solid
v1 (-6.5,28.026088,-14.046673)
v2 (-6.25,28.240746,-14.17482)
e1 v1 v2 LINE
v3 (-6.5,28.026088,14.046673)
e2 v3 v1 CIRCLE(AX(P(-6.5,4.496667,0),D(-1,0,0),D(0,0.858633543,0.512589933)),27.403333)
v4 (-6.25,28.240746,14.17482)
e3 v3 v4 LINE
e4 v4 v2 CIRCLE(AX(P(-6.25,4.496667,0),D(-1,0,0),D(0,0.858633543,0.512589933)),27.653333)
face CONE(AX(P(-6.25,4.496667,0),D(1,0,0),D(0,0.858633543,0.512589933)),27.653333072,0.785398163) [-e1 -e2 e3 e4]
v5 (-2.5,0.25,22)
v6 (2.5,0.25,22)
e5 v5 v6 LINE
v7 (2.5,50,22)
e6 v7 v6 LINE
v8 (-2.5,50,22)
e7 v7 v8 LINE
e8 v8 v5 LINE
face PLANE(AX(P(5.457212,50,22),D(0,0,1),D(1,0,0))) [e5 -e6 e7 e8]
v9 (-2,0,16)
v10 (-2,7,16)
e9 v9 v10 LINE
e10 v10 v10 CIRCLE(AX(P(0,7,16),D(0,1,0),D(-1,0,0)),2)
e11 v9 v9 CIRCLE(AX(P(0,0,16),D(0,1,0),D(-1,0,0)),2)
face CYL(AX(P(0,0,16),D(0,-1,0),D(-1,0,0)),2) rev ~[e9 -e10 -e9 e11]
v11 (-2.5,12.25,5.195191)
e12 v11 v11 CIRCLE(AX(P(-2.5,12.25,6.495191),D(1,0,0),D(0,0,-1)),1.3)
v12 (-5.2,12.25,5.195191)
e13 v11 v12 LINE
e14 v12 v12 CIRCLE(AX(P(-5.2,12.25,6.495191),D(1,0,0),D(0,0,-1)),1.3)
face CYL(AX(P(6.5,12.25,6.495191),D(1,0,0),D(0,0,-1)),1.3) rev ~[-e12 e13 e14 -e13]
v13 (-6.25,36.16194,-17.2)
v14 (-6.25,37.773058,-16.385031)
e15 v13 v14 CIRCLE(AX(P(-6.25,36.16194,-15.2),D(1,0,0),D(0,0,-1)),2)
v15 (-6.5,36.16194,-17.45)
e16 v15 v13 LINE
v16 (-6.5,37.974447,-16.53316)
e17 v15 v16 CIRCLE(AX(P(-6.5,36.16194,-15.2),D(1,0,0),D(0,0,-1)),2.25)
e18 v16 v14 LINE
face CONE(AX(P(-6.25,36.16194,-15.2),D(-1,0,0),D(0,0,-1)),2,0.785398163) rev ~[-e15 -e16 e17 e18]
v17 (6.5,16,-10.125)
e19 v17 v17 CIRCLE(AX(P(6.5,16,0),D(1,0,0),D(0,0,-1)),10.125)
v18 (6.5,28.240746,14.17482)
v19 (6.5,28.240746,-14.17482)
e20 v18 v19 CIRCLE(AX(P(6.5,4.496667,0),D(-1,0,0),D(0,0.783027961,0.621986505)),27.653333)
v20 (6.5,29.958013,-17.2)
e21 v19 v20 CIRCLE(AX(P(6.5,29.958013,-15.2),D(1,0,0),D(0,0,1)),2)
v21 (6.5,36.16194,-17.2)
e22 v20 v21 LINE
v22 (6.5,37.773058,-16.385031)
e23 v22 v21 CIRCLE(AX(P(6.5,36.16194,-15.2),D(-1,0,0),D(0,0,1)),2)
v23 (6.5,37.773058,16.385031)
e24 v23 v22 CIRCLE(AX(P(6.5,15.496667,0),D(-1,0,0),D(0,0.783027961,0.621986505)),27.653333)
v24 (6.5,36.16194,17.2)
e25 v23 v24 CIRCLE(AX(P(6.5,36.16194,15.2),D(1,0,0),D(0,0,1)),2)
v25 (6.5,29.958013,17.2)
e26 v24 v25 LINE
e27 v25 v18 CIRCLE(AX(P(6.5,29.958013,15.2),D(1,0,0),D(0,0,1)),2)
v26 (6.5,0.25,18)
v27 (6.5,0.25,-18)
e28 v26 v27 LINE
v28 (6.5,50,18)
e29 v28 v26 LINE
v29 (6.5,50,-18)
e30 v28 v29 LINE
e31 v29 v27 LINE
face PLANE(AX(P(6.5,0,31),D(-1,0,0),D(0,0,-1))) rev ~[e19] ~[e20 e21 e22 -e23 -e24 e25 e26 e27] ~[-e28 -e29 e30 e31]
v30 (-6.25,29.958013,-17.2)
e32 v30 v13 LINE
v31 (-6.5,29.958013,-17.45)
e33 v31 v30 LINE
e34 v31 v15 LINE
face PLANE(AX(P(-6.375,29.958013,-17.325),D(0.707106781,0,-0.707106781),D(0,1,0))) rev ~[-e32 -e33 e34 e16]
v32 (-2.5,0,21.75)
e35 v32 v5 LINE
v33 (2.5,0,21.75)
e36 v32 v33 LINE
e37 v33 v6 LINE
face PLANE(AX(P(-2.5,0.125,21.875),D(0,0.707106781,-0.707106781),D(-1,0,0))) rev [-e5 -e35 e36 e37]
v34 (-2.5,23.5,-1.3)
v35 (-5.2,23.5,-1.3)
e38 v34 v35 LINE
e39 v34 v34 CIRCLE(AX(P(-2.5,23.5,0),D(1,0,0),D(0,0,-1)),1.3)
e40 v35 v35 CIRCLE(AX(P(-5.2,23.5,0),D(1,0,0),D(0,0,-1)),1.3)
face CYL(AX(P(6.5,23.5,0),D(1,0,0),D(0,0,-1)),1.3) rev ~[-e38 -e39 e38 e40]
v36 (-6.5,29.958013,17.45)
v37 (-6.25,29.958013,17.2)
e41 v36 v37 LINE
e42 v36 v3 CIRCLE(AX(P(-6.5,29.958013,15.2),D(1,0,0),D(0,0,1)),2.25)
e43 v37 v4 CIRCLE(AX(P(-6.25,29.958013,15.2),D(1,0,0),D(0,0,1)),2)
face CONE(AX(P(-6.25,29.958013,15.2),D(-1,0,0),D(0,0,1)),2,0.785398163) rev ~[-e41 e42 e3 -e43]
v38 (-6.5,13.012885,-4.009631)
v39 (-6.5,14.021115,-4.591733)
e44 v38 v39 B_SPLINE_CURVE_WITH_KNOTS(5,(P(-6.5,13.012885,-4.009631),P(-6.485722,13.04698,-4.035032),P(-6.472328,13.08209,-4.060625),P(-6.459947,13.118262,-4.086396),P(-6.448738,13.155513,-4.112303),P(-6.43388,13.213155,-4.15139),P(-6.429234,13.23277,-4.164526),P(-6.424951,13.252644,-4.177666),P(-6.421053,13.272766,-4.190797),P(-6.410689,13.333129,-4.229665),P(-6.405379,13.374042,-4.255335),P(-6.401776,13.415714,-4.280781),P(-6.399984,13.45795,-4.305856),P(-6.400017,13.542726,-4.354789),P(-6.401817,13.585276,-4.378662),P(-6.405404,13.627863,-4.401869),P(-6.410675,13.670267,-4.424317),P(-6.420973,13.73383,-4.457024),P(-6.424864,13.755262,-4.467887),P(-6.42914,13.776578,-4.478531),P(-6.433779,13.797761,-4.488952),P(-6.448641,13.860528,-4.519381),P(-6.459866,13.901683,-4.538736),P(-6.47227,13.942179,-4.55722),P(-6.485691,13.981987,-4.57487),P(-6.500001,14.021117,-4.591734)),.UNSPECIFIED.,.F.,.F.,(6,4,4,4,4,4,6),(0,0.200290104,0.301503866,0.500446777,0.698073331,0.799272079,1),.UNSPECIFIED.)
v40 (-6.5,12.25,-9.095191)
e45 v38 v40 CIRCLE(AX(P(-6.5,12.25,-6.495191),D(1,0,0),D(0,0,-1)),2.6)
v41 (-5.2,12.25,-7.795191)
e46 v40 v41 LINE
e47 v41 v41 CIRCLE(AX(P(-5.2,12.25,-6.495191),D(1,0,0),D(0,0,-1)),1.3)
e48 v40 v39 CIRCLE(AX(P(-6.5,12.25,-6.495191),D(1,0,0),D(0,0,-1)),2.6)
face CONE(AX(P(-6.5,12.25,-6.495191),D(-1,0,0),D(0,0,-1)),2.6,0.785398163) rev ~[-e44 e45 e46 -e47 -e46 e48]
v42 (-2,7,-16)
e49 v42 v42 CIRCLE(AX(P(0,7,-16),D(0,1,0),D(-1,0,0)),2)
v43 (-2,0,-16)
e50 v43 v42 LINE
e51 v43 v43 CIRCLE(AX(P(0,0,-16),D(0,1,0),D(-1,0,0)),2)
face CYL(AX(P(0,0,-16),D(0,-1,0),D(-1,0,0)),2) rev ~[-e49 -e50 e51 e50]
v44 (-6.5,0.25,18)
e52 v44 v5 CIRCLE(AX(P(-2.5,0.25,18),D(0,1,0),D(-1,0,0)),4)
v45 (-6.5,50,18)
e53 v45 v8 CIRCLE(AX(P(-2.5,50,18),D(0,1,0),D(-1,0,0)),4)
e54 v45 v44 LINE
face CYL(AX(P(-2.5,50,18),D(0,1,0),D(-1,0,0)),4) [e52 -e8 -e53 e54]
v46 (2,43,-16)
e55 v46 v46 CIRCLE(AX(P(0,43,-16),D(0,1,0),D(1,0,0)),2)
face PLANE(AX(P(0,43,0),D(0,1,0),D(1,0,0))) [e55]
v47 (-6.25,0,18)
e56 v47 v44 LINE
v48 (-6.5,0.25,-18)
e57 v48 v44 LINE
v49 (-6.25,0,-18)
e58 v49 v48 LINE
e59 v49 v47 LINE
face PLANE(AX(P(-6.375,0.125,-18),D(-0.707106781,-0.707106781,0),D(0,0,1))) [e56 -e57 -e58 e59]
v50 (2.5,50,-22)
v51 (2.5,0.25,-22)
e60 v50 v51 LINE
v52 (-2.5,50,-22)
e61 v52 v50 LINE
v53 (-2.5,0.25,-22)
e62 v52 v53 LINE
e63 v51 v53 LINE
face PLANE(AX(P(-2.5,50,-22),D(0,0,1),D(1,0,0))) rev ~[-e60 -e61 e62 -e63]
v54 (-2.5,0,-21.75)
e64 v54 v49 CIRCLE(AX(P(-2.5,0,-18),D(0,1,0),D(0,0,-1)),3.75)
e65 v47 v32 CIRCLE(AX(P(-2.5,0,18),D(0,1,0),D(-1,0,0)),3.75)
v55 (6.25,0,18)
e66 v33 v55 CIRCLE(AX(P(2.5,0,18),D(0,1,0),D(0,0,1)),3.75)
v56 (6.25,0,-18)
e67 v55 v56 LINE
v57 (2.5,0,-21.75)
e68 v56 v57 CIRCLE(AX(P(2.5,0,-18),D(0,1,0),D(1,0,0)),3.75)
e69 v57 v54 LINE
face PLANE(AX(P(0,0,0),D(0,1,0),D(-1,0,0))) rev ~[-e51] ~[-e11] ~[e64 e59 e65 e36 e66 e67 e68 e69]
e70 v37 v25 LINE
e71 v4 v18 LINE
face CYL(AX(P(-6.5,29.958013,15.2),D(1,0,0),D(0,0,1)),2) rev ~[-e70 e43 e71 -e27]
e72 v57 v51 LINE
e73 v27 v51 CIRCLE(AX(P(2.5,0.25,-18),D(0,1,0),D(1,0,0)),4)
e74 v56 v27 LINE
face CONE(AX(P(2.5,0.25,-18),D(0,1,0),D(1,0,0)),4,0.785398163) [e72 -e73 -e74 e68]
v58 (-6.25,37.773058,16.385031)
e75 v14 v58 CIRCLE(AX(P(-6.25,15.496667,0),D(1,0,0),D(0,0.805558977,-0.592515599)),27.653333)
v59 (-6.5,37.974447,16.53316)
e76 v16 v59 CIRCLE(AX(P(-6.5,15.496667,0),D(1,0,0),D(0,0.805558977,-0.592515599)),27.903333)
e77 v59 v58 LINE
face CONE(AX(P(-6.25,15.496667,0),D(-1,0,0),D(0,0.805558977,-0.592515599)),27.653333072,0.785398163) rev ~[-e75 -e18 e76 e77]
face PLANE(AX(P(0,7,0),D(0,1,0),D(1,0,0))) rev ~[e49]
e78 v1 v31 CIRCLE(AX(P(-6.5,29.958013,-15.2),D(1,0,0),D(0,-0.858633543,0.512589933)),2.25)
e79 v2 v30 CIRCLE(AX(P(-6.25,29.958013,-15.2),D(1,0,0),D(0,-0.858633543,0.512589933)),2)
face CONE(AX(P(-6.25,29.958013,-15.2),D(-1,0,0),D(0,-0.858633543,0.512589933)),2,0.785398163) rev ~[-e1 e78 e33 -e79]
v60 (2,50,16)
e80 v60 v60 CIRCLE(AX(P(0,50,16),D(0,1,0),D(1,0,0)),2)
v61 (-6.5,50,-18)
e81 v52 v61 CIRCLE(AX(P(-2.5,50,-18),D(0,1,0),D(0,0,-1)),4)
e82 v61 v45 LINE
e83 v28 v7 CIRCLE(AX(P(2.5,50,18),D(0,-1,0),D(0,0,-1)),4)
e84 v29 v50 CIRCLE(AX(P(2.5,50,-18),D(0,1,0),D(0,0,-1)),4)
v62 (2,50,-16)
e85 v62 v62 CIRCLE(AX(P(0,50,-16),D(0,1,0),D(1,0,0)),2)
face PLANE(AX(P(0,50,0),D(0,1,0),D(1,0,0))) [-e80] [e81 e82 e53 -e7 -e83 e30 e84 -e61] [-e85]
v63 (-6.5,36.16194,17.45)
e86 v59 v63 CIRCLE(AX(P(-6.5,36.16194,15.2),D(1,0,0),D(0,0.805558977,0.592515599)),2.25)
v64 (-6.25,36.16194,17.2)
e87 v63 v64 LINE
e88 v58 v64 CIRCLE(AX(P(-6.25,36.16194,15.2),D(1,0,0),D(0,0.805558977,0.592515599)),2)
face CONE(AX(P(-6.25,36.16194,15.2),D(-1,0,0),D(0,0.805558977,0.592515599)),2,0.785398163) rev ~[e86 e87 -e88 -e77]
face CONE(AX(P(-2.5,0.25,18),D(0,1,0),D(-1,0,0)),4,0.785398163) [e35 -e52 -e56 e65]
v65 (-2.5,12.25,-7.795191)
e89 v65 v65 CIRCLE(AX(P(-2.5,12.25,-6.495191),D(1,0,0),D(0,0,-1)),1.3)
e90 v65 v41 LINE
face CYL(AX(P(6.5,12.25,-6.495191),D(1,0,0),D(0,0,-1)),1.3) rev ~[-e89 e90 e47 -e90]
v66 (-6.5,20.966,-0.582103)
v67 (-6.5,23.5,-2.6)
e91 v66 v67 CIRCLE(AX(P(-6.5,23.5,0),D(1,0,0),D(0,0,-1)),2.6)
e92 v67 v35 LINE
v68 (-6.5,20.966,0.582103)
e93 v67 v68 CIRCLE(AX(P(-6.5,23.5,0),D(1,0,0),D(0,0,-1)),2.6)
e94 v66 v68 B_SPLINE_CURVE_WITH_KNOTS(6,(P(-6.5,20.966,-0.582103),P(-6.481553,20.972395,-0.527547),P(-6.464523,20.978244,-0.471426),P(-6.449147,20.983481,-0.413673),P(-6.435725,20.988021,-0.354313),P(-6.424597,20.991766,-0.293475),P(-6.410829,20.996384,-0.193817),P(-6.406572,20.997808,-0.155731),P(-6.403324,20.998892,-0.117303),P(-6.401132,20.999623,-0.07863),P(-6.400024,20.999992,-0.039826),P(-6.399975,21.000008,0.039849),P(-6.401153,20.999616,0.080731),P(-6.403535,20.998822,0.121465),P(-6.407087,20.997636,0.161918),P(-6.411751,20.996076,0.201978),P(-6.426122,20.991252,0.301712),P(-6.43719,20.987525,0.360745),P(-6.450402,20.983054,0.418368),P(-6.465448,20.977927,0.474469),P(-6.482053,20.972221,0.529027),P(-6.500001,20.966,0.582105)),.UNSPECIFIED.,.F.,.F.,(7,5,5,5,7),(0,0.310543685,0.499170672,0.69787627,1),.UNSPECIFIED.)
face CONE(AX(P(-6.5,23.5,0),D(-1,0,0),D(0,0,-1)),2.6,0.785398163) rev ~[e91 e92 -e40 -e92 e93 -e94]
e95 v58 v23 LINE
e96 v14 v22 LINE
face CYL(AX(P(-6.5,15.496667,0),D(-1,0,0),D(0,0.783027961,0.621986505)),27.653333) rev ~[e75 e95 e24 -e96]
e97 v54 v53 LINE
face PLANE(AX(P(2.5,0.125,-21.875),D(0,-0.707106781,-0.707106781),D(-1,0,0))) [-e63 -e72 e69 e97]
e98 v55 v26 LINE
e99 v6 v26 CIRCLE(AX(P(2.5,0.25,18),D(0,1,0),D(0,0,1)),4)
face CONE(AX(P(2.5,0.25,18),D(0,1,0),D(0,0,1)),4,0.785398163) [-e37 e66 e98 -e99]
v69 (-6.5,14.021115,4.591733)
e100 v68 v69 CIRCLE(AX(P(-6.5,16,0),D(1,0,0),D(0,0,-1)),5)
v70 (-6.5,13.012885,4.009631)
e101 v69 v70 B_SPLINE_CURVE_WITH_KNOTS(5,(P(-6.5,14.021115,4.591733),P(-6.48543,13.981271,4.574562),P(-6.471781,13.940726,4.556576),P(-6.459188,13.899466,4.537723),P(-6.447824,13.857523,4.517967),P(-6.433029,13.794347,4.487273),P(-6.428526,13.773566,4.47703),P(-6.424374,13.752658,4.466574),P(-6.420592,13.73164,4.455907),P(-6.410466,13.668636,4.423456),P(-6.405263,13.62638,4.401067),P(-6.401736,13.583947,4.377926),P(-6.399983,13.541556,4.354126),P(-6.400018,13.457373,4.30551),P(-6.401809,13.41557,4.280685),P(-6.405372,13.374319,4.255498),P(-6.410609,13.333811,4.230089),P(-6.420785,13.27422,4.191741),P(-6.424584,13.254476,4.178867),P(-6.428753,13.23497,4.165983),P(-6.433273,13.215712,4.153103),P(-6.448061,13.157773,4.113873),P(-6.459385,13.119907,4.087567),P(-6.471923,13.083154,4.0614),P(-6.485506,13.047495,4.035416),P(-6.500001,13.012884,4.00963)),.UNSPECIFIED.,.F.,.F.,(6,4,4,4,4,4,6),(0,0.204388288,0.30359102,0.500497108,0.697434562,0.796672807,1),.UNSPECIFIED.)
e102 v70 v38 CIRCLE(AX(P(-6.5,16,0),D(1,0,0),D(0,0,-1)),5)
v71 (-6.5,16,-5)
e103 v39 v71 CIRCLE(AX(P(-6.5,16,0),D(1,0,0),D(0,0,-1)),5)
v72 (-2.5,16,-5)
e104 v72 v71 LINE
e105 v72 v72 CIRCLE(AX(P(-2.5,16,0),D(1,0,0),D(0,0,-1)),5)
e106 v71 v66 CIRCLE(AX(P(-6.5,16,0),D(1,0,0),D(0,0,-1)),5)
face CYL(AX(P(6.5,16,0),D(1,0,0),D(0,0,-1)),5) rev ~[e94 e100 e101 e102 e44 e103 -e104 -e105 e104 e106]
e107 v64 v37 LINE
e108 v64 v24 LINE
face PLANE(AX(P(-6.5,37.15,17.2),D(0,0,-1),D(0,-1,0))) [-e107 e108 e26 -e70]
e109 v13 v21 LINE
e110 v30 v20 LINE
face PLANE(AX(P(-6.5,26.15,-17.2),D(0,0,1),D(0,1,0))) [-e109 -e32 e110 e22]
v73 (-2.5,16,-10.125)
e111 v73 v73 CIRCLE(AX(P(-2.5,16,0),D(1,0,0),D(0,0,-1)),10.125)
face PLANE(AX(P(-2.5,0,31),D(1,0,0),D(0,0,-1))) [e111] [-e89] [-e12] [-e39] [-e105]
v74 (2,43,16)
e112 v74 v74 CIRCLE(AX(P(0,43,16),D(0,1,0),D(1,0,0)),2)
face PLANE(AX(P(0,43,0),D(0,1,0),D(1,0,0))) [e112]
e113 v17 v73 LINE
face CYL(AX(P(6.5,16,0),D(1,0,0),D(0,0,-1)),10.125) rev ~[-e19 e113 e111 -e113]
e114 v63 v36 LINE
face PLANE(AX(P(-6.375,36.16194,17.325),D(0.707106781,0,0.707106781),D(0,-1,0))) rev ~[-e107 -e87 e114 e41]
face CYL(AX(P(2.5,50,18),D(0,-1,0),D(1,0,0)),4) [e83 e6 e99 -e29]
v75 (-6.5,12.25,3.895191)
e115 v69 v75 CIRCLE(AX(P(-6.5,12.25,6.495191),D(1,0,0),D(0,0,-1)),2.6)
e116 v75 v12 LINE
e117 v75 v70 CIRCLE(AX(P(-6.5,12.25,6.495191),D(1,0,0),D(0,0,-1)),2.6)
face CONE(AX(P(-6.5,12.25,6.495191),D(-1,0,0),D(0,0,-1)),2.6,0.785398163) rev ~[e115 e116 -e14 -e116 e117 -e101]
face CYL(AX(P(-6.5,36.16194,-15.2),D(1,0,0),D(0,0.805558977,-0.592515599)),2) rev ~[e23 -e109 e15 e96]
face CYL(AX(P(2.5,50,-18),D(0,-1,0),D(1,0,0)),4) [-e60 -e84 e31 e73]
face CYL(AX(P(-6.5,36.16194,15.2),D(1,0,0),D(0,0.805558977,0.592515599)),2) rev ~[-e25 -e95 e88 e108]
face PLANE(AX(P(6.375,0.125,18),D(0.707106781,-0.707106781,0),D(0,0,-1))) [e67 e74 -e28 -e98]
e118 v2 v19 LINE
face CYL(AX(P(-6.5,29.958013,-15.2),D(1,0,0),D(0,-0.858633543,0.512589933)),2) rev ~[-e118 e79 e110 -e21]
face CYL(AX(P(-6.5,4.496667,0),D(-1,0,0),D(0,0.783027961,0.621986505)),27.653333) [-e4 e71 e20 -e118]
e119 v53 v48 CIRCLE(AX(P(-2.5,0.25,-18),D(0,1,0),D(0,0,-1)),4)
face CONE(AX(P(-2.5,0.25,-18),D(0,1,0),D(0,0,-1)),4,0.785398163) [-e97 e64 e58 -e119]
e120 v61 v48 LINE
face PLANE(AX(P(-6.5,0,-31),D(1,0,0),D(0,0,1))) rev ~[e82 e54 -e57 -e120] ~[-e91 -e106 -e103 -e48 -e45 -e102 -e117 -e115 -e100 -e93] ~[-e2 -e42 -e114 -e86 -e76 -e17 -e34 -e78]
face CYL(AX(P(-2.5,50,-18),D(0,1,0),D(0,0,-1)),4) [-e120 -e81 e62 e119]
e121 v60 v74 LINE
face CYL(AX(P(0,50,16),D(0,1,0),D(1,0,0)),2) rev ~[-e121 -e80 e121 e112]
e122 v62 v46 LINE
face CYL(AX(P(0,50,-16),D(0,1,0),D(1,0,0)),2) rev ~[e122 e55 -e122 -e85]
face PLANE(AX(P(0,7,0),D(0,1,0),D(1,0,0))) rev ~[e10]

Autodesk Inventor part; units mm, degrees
ref_plane "YZ Plane" through (0, 0, 0) normal (1, 0, 0) x (0, 1, 0)
ref_plane "XZ Plane" through (0, 0, 0) normal (0, 1, 0) x (-1, 0, 0)
ref_plane "XY Plane" through (0, 0, 0) normal (0, 0, 1) x (1, 0, 0)
sketch "Эскиз1" plane through (0, 0, 0) normal (0, 1, 0) x (-1, 0, 0)
  line L0 (6.5, 31) -> (-6.5, 31)
  line L1 (-6.5, 31) -> (-6.5, -31)
  line L2 (-6.5, -31) -> (6.5, -31)
  line L3 (6.5, -31) -> (6.5, 31)
  line L4 (-6.5, 31) -> (6.5, -31) construction
  line L5 (0, 31) -> (0, -31) construction
  circle A0 centre (0, 16) radius 2
  line L6 (6.5, 0) -> (-6.5, 0) construction
  circle A1 centre (0, -16) radius 2
  point P0 (0, 0)
  point P1 (0, 0)
  dimension "d0" = 13
  dimension "d1" = 62
  dimension "d2" = 16
  dimension "d3" = 4
extrude "Выдавливание1" add sketch "Эскиз1" along normal blind 32
sketch "Эскиз2" plane through (6.5, 0, 31) normal (1, 0, 0) x (0, 0, -1)
  line L0 (0, 32) -> (62, 32)
  line L1 (62, 0) -> (0, 0)
  line L2 (62, 32) -> (0, 0) construction
  circle A0 centre (31, 16) radius 10.15
  line L3 (20.85, 16) -> (41.15, 16) construction
  circle A1 centre (31, 16) radius 10.125
  line L4 (31, 26.125) -> (31, 5.875)
  line L5 (62, 0) -> (62, 32)
  circle A2 centre (31, 16) radius 5
  line L6 (31, 16) -> (24.504809, 12.25) construction
  line L7 (31, 16) -> (37.495191, 12.25) construction
  circle A3 centre (31, 16) radius 7.5 construction
  circle A4 centre (31, 23.5) radius 1.3
  circle A5 centre (37.495191, 12.25) radius 1.3
  circle A6 centre (24.504809, 12.25) radius 1.3
  line L8 (37.495191, 12.25) -> (36.55555, 10.622495) construction
  circle A7 centre (31, 16) radius 10 construction
  line L9 (37.495191, 12.25) -> (39.660254, 11) construction
  point P0 (31, 0)
  dimension "d60" = 20
  dimension "d9" = 20.3
  dimension "d17" = 10
  dimension "d21" = 20.25
  dimension "d57" = 120
  dimension "d58" = 120
  dimension "d59" = 2.6
  dimension "d61" = 2.5
  dimension "d65" = 15
extrude "Выдавливание3" cut sketch "Эскиз2" against normal through all contours A4 L4 | L4 A4 | A2 L4 | L4 A2 | A5 | A6
sketch "Эскиз2 outline for Выдавливание4" plane through (6.5, 0, 31) normal (1, 0, 0) x (0, 0, -1)
  circle A0 centre (31, 16) radius 10.125
extrude "Выдавливание4" cut sketch "Эскиз2 outline for Выдавливание4" against normal blind 9
sketch "Эскиз3" plane through (0, 32, 0) normal (0, 1, 0) x (1, 0, 0)
  circle A0 centre (0, -16) radius 2 projected
  circle A1 centre (0, 16) radius 2 projected
  point P0 (0, 0)
extrude "Выдавливание5" add sketch "Эскиз3" against normal blind 25
fillet "Сопряжение1" radius 6 2 edges at (6.5, 16, 31) (6.5, 16, -31)
chamfer "Фаска1" distance 1.3 angle 45 3 edges at (-6.5, 12.25, 7.7952) (-6.5, 12.25, -5.1952) (-6.5, 23.5, 1.3)
sketch "Эскиз6" plane through (0, 32, 0) normal (0, 1, 0) x (1, 0, 0)
  arc A0 (6.5, 25) -> (0.5, 31) centre (0.5, 25) ccw projected
  line L0 (0.5, 31) -> (-6.5, 31) projected
  line L1 (-6.5, 31) -> (-6.5, -31) projected
  line L2 (-6.5, -31) -> (0.5, -31) projected
  arc A1 (0.5, -31) -> (6.5, -25) centre (0.5, -25) ccw projected
  line L3 (6.5, -25) -> (6.5, 25) projected
  point P0 (0, 0)
extrude "Выдавливание6" add sketch "Эскиз6" along normal blind 18
sketch "Эскиз7" plane through (0, 50, 0) normal (0, 1, 0) x (1, 0, 0)
  circle A0 centre (0, -16) radius 2 projected
  circle A1 centre (0, 16) radius 2 projected
  point P0 (0, 0)
extrude "Выдавливание7" cut sketch "Эскиз7" against normal blind 7
sketch "Эскиз9" plane through (-6.5, 0, -31) normal (-1, 0, 0) x (0, 0, 1)
  line L0 (0, 0) -> (0, 50)
  line L1 (0, 50) -> (62, 0) construction
  line L2 (7.2, 43) -> (54.8, 43)
  line L3 (54.8, 43) -> (54.8, 7)
  line L4 (54.8, 7) -> (7.2, 7)
  line L5 (7.2, 7) -> (7.2, 43)
  line L6 (0, 50) -> (62, 50)
  line L7 (0, 0) -> (62, 0)
  line L8 (62, 0) -> (62, 50)
  line L9 (62, 0) -> (56, 0)
  line L10 (7.2, 43) -> (0, 43) construction
  line L11 (7.2, 7) -> (0, 7) construction
  line L12 (54.8, 7) -> (62, 7) construction
  line L13 (54.8, 43) -> (62, 43) construction
  arc A0 (0, 7) -> (0, 43) centre (-18.9, 25) ccw
  arc A1 (62, 43) -> (62, 7) centre (80.9, 25) ccw
  line L14 (13.8, 38.870968) -> (48.2, 38.870968) construction
  line L15 (48.2, 38.870968) -> (48.2, 26.15)
  line L16 (48.2, 26.15) -> (13.8, 26.15) construction
  line L17 (13.8, 26.15) -> (13.8, 38.870968)
  line L18 (31, 38.870968) -> (31, 50) construction
  arc A2 (48.2, 26.15) -> (13.8, 26.15) centre (31, 4.496667) ccw
  arc A3 (26.990369, 13.012884) -> (35.009631, 13.012884) centre (31, 16) ccw
  arc A4 (48.2, 37.15) -> (13.8, 37.15) centre (31, 15.496667) ccw
  line L19 (13.8, 37.15) -> (48.2, 37.15) construction
  circle A5 centre (31, 16) radius 10.15 construction
  point P0 (31, 0)
  point P1 (31, 25)
  point P2 (54.8, 25)
  point P3 (7.2, 25)
  point P4 (31, 32.15)
  dimension "d30" = 7
  dimension "d31" = 7
  dimension "d33" = 7.2
  dimension "d42" = 6.6
  dimension "d44" = 11
  dimension "d45" = 6
extrude "Выдавливание8" cut sketch "Эскиз9" against normal up to surface (13 mm away) contours L0 A0 | A1 L8
extrude "Выдавливание9" cut sketch "Эскиз9" against normal up to surface (13 mm away) contours A4 L2 | L2 A4 L15 A2 L17
fillet "Сопряжение2" radius 2 4 edges at (0, 26.15, 17.2) (0, 26.15, -17.2) (0, 37.15, 17.2) (0, 37.15, -17.2)
sketch "Эскиз11" plane through (0, 50, 0) normal (0, 1, 0) x (1, 0, 0)
  arc A0 (1, -22) -> (-3, -26) centre (1, -26) ccw
  line L0 (-3, -29.486243) -> (-3, -26)
  line L1 (5.457212, -22) -> (-4.601252, -22)
  arc A1 (-3, -29.486243) -> (-1.997801, -32.134486) centre (1, -29.486243) ccw
  arc A2 (-3, -29.486243) -> (-1.997801, -32.134486) centre (1, -29.486243) ccw
  line L2 (-1.997801, -32.134486) -> (17.505015, -54.211602)
  line L3 (6.5, -25) -> (6.5, 25)
  line L4 (5.457212, -22) -> (6.5, -22)
  arc A3 (0.5, -31) -> (6.5, -25) centre (0.5, -25) ccw
  line L5 (-6.5, -31) -> (0.5, -31)
  line L6 (6.5, -31) -> (6.5, 31)
  point P0 (0, 0)
  point P1 (-2.702505, -31)
  point P2 (-2.877907, -22)
  point P3 (0.96893, -22.000121)
extrude "Выдавливание10" cut sketch "Эскиз11" against normal up to surface (50 mm away)
mirror "Зеркальное отражение1" about plane through (0, 0, 0) normal (0, 0, 1) of "Выдавливание10"
fillet "Сопряжение3" radius 4 2 edges at (6.5, 25, 22) (6.5, 25, -22)
sketch "Эскиз12" plane through (0, 50, 0) normal (0, 1, 0) x (1, 0, 0)
  circle A0 centre (0, 16) radius 2
  circle A1 centre (0, -16) radius 2
  circle A2 centre (0, -16) radius 2
  line L0 (0, 16) -> (0, -16)
  arc A3 (6.5, 18) -> (2.5, 22) centre (2.5, 18) ccw
  line L1 (6.5, -18) -> (6.5, 18)
  arc A4 (2.5, -22) -> (6.5, -18) centre (2.5, -18) ccw
  arc A5 (-2.5, 22) -> (-6.5, 18) centre (-2.5, 18) ccw
  line L2 (-6.5, -18) -> (-6.5, 18)
  arc A6 (-6.5, -18) -> (-2.5, -22) centre (-2.5, -18) ccw
  arc A7 (6.5, 18) -> (2.5, 22) centre (2.5, 18) ccw
  line L3 (2.5, 22) -> (1, 22)
  arc A8 (-3, 26) -> (1, 22) centre (1, 26) ccw
  line L4 (-3, 26) -> (-3, 29.486243)
  arc A9 (-2.702505, 31) -> (-3, 29.486243) centre (1, 29.486243) ccw
  line L5 (-2.702505, 31) -> (-6.5, 31)
  line L6 (-6.5, 31) -> (-6.5, -31)
  line L7 (-6.5, -31) -> (-2.702505, -31)
  arc A10 (-3, -29.486243) -> (-2.702505, -31) centre (1, -29.486243) ccw
  line L8 (-3, -29.486243) -> (-3, -26)
  arc A11 (1, -22) -> (-3, -26) centre (1, -26) ccw
  line L9 (1, -22) -> (2.5, -22)
  arc A12 (2.5, -22) -> (6.5, -18) centre (2.5, -18) ccw
  line L10 (6.5, -18) -> (6.5, 18)
  circle A13 centre (0, 16) radius 2
  circle A14 centre (0, -16) radius 2
  line L11 (1, 22) -> (2.5, 22)
  line L12 (-2.5, 22) -> (2.5, 22)
  line L13 (2.5, -22) -> (1, -22)
  line L14 (-2.5, -22) -> (1, -22)
  point P0 (0, 0)
  point P1 (1, 22)
extrude "Выдавливание11" cut sketch "Эскиз12" against normal up to surface (50 mm away) contours L12 A5 L6 L5 A9 L4 A8 | A11 L8 A10 L7 L6 A6 L14
chamfer "Фаска2" distance 0.25 angle 45 8 edges at (6.5, 0, 0) (5.3284, 0, -20.8284) (0, 0, -22) (-5.3284, 0, -20.8284) (-6.5, 0, 0) (-5.3284, 0, 20.8284) (0, 0, 22) (5.3284, 0, 20.8284)
chamfer "Фаска3" distance 0.25 angle 45 8 edges at (-6.5, 43.15, 0) (-6.5, 37.0647, 16.9847) (-6.5, 33.06, 17.2) (-6.5, 28.2187, 16.1873) (-6.5, 32.15, 0) (-6.5, 28.2187, -16.1873) (-6.5, 33.06, -17.2) (-6.5, 37.0647, -16.9847)
equation "\"d58\" = d57"
equation "\"d31\" = d30"
properties part number "motor_mount_edge" material "Полиэтилен, низкая плотность"
